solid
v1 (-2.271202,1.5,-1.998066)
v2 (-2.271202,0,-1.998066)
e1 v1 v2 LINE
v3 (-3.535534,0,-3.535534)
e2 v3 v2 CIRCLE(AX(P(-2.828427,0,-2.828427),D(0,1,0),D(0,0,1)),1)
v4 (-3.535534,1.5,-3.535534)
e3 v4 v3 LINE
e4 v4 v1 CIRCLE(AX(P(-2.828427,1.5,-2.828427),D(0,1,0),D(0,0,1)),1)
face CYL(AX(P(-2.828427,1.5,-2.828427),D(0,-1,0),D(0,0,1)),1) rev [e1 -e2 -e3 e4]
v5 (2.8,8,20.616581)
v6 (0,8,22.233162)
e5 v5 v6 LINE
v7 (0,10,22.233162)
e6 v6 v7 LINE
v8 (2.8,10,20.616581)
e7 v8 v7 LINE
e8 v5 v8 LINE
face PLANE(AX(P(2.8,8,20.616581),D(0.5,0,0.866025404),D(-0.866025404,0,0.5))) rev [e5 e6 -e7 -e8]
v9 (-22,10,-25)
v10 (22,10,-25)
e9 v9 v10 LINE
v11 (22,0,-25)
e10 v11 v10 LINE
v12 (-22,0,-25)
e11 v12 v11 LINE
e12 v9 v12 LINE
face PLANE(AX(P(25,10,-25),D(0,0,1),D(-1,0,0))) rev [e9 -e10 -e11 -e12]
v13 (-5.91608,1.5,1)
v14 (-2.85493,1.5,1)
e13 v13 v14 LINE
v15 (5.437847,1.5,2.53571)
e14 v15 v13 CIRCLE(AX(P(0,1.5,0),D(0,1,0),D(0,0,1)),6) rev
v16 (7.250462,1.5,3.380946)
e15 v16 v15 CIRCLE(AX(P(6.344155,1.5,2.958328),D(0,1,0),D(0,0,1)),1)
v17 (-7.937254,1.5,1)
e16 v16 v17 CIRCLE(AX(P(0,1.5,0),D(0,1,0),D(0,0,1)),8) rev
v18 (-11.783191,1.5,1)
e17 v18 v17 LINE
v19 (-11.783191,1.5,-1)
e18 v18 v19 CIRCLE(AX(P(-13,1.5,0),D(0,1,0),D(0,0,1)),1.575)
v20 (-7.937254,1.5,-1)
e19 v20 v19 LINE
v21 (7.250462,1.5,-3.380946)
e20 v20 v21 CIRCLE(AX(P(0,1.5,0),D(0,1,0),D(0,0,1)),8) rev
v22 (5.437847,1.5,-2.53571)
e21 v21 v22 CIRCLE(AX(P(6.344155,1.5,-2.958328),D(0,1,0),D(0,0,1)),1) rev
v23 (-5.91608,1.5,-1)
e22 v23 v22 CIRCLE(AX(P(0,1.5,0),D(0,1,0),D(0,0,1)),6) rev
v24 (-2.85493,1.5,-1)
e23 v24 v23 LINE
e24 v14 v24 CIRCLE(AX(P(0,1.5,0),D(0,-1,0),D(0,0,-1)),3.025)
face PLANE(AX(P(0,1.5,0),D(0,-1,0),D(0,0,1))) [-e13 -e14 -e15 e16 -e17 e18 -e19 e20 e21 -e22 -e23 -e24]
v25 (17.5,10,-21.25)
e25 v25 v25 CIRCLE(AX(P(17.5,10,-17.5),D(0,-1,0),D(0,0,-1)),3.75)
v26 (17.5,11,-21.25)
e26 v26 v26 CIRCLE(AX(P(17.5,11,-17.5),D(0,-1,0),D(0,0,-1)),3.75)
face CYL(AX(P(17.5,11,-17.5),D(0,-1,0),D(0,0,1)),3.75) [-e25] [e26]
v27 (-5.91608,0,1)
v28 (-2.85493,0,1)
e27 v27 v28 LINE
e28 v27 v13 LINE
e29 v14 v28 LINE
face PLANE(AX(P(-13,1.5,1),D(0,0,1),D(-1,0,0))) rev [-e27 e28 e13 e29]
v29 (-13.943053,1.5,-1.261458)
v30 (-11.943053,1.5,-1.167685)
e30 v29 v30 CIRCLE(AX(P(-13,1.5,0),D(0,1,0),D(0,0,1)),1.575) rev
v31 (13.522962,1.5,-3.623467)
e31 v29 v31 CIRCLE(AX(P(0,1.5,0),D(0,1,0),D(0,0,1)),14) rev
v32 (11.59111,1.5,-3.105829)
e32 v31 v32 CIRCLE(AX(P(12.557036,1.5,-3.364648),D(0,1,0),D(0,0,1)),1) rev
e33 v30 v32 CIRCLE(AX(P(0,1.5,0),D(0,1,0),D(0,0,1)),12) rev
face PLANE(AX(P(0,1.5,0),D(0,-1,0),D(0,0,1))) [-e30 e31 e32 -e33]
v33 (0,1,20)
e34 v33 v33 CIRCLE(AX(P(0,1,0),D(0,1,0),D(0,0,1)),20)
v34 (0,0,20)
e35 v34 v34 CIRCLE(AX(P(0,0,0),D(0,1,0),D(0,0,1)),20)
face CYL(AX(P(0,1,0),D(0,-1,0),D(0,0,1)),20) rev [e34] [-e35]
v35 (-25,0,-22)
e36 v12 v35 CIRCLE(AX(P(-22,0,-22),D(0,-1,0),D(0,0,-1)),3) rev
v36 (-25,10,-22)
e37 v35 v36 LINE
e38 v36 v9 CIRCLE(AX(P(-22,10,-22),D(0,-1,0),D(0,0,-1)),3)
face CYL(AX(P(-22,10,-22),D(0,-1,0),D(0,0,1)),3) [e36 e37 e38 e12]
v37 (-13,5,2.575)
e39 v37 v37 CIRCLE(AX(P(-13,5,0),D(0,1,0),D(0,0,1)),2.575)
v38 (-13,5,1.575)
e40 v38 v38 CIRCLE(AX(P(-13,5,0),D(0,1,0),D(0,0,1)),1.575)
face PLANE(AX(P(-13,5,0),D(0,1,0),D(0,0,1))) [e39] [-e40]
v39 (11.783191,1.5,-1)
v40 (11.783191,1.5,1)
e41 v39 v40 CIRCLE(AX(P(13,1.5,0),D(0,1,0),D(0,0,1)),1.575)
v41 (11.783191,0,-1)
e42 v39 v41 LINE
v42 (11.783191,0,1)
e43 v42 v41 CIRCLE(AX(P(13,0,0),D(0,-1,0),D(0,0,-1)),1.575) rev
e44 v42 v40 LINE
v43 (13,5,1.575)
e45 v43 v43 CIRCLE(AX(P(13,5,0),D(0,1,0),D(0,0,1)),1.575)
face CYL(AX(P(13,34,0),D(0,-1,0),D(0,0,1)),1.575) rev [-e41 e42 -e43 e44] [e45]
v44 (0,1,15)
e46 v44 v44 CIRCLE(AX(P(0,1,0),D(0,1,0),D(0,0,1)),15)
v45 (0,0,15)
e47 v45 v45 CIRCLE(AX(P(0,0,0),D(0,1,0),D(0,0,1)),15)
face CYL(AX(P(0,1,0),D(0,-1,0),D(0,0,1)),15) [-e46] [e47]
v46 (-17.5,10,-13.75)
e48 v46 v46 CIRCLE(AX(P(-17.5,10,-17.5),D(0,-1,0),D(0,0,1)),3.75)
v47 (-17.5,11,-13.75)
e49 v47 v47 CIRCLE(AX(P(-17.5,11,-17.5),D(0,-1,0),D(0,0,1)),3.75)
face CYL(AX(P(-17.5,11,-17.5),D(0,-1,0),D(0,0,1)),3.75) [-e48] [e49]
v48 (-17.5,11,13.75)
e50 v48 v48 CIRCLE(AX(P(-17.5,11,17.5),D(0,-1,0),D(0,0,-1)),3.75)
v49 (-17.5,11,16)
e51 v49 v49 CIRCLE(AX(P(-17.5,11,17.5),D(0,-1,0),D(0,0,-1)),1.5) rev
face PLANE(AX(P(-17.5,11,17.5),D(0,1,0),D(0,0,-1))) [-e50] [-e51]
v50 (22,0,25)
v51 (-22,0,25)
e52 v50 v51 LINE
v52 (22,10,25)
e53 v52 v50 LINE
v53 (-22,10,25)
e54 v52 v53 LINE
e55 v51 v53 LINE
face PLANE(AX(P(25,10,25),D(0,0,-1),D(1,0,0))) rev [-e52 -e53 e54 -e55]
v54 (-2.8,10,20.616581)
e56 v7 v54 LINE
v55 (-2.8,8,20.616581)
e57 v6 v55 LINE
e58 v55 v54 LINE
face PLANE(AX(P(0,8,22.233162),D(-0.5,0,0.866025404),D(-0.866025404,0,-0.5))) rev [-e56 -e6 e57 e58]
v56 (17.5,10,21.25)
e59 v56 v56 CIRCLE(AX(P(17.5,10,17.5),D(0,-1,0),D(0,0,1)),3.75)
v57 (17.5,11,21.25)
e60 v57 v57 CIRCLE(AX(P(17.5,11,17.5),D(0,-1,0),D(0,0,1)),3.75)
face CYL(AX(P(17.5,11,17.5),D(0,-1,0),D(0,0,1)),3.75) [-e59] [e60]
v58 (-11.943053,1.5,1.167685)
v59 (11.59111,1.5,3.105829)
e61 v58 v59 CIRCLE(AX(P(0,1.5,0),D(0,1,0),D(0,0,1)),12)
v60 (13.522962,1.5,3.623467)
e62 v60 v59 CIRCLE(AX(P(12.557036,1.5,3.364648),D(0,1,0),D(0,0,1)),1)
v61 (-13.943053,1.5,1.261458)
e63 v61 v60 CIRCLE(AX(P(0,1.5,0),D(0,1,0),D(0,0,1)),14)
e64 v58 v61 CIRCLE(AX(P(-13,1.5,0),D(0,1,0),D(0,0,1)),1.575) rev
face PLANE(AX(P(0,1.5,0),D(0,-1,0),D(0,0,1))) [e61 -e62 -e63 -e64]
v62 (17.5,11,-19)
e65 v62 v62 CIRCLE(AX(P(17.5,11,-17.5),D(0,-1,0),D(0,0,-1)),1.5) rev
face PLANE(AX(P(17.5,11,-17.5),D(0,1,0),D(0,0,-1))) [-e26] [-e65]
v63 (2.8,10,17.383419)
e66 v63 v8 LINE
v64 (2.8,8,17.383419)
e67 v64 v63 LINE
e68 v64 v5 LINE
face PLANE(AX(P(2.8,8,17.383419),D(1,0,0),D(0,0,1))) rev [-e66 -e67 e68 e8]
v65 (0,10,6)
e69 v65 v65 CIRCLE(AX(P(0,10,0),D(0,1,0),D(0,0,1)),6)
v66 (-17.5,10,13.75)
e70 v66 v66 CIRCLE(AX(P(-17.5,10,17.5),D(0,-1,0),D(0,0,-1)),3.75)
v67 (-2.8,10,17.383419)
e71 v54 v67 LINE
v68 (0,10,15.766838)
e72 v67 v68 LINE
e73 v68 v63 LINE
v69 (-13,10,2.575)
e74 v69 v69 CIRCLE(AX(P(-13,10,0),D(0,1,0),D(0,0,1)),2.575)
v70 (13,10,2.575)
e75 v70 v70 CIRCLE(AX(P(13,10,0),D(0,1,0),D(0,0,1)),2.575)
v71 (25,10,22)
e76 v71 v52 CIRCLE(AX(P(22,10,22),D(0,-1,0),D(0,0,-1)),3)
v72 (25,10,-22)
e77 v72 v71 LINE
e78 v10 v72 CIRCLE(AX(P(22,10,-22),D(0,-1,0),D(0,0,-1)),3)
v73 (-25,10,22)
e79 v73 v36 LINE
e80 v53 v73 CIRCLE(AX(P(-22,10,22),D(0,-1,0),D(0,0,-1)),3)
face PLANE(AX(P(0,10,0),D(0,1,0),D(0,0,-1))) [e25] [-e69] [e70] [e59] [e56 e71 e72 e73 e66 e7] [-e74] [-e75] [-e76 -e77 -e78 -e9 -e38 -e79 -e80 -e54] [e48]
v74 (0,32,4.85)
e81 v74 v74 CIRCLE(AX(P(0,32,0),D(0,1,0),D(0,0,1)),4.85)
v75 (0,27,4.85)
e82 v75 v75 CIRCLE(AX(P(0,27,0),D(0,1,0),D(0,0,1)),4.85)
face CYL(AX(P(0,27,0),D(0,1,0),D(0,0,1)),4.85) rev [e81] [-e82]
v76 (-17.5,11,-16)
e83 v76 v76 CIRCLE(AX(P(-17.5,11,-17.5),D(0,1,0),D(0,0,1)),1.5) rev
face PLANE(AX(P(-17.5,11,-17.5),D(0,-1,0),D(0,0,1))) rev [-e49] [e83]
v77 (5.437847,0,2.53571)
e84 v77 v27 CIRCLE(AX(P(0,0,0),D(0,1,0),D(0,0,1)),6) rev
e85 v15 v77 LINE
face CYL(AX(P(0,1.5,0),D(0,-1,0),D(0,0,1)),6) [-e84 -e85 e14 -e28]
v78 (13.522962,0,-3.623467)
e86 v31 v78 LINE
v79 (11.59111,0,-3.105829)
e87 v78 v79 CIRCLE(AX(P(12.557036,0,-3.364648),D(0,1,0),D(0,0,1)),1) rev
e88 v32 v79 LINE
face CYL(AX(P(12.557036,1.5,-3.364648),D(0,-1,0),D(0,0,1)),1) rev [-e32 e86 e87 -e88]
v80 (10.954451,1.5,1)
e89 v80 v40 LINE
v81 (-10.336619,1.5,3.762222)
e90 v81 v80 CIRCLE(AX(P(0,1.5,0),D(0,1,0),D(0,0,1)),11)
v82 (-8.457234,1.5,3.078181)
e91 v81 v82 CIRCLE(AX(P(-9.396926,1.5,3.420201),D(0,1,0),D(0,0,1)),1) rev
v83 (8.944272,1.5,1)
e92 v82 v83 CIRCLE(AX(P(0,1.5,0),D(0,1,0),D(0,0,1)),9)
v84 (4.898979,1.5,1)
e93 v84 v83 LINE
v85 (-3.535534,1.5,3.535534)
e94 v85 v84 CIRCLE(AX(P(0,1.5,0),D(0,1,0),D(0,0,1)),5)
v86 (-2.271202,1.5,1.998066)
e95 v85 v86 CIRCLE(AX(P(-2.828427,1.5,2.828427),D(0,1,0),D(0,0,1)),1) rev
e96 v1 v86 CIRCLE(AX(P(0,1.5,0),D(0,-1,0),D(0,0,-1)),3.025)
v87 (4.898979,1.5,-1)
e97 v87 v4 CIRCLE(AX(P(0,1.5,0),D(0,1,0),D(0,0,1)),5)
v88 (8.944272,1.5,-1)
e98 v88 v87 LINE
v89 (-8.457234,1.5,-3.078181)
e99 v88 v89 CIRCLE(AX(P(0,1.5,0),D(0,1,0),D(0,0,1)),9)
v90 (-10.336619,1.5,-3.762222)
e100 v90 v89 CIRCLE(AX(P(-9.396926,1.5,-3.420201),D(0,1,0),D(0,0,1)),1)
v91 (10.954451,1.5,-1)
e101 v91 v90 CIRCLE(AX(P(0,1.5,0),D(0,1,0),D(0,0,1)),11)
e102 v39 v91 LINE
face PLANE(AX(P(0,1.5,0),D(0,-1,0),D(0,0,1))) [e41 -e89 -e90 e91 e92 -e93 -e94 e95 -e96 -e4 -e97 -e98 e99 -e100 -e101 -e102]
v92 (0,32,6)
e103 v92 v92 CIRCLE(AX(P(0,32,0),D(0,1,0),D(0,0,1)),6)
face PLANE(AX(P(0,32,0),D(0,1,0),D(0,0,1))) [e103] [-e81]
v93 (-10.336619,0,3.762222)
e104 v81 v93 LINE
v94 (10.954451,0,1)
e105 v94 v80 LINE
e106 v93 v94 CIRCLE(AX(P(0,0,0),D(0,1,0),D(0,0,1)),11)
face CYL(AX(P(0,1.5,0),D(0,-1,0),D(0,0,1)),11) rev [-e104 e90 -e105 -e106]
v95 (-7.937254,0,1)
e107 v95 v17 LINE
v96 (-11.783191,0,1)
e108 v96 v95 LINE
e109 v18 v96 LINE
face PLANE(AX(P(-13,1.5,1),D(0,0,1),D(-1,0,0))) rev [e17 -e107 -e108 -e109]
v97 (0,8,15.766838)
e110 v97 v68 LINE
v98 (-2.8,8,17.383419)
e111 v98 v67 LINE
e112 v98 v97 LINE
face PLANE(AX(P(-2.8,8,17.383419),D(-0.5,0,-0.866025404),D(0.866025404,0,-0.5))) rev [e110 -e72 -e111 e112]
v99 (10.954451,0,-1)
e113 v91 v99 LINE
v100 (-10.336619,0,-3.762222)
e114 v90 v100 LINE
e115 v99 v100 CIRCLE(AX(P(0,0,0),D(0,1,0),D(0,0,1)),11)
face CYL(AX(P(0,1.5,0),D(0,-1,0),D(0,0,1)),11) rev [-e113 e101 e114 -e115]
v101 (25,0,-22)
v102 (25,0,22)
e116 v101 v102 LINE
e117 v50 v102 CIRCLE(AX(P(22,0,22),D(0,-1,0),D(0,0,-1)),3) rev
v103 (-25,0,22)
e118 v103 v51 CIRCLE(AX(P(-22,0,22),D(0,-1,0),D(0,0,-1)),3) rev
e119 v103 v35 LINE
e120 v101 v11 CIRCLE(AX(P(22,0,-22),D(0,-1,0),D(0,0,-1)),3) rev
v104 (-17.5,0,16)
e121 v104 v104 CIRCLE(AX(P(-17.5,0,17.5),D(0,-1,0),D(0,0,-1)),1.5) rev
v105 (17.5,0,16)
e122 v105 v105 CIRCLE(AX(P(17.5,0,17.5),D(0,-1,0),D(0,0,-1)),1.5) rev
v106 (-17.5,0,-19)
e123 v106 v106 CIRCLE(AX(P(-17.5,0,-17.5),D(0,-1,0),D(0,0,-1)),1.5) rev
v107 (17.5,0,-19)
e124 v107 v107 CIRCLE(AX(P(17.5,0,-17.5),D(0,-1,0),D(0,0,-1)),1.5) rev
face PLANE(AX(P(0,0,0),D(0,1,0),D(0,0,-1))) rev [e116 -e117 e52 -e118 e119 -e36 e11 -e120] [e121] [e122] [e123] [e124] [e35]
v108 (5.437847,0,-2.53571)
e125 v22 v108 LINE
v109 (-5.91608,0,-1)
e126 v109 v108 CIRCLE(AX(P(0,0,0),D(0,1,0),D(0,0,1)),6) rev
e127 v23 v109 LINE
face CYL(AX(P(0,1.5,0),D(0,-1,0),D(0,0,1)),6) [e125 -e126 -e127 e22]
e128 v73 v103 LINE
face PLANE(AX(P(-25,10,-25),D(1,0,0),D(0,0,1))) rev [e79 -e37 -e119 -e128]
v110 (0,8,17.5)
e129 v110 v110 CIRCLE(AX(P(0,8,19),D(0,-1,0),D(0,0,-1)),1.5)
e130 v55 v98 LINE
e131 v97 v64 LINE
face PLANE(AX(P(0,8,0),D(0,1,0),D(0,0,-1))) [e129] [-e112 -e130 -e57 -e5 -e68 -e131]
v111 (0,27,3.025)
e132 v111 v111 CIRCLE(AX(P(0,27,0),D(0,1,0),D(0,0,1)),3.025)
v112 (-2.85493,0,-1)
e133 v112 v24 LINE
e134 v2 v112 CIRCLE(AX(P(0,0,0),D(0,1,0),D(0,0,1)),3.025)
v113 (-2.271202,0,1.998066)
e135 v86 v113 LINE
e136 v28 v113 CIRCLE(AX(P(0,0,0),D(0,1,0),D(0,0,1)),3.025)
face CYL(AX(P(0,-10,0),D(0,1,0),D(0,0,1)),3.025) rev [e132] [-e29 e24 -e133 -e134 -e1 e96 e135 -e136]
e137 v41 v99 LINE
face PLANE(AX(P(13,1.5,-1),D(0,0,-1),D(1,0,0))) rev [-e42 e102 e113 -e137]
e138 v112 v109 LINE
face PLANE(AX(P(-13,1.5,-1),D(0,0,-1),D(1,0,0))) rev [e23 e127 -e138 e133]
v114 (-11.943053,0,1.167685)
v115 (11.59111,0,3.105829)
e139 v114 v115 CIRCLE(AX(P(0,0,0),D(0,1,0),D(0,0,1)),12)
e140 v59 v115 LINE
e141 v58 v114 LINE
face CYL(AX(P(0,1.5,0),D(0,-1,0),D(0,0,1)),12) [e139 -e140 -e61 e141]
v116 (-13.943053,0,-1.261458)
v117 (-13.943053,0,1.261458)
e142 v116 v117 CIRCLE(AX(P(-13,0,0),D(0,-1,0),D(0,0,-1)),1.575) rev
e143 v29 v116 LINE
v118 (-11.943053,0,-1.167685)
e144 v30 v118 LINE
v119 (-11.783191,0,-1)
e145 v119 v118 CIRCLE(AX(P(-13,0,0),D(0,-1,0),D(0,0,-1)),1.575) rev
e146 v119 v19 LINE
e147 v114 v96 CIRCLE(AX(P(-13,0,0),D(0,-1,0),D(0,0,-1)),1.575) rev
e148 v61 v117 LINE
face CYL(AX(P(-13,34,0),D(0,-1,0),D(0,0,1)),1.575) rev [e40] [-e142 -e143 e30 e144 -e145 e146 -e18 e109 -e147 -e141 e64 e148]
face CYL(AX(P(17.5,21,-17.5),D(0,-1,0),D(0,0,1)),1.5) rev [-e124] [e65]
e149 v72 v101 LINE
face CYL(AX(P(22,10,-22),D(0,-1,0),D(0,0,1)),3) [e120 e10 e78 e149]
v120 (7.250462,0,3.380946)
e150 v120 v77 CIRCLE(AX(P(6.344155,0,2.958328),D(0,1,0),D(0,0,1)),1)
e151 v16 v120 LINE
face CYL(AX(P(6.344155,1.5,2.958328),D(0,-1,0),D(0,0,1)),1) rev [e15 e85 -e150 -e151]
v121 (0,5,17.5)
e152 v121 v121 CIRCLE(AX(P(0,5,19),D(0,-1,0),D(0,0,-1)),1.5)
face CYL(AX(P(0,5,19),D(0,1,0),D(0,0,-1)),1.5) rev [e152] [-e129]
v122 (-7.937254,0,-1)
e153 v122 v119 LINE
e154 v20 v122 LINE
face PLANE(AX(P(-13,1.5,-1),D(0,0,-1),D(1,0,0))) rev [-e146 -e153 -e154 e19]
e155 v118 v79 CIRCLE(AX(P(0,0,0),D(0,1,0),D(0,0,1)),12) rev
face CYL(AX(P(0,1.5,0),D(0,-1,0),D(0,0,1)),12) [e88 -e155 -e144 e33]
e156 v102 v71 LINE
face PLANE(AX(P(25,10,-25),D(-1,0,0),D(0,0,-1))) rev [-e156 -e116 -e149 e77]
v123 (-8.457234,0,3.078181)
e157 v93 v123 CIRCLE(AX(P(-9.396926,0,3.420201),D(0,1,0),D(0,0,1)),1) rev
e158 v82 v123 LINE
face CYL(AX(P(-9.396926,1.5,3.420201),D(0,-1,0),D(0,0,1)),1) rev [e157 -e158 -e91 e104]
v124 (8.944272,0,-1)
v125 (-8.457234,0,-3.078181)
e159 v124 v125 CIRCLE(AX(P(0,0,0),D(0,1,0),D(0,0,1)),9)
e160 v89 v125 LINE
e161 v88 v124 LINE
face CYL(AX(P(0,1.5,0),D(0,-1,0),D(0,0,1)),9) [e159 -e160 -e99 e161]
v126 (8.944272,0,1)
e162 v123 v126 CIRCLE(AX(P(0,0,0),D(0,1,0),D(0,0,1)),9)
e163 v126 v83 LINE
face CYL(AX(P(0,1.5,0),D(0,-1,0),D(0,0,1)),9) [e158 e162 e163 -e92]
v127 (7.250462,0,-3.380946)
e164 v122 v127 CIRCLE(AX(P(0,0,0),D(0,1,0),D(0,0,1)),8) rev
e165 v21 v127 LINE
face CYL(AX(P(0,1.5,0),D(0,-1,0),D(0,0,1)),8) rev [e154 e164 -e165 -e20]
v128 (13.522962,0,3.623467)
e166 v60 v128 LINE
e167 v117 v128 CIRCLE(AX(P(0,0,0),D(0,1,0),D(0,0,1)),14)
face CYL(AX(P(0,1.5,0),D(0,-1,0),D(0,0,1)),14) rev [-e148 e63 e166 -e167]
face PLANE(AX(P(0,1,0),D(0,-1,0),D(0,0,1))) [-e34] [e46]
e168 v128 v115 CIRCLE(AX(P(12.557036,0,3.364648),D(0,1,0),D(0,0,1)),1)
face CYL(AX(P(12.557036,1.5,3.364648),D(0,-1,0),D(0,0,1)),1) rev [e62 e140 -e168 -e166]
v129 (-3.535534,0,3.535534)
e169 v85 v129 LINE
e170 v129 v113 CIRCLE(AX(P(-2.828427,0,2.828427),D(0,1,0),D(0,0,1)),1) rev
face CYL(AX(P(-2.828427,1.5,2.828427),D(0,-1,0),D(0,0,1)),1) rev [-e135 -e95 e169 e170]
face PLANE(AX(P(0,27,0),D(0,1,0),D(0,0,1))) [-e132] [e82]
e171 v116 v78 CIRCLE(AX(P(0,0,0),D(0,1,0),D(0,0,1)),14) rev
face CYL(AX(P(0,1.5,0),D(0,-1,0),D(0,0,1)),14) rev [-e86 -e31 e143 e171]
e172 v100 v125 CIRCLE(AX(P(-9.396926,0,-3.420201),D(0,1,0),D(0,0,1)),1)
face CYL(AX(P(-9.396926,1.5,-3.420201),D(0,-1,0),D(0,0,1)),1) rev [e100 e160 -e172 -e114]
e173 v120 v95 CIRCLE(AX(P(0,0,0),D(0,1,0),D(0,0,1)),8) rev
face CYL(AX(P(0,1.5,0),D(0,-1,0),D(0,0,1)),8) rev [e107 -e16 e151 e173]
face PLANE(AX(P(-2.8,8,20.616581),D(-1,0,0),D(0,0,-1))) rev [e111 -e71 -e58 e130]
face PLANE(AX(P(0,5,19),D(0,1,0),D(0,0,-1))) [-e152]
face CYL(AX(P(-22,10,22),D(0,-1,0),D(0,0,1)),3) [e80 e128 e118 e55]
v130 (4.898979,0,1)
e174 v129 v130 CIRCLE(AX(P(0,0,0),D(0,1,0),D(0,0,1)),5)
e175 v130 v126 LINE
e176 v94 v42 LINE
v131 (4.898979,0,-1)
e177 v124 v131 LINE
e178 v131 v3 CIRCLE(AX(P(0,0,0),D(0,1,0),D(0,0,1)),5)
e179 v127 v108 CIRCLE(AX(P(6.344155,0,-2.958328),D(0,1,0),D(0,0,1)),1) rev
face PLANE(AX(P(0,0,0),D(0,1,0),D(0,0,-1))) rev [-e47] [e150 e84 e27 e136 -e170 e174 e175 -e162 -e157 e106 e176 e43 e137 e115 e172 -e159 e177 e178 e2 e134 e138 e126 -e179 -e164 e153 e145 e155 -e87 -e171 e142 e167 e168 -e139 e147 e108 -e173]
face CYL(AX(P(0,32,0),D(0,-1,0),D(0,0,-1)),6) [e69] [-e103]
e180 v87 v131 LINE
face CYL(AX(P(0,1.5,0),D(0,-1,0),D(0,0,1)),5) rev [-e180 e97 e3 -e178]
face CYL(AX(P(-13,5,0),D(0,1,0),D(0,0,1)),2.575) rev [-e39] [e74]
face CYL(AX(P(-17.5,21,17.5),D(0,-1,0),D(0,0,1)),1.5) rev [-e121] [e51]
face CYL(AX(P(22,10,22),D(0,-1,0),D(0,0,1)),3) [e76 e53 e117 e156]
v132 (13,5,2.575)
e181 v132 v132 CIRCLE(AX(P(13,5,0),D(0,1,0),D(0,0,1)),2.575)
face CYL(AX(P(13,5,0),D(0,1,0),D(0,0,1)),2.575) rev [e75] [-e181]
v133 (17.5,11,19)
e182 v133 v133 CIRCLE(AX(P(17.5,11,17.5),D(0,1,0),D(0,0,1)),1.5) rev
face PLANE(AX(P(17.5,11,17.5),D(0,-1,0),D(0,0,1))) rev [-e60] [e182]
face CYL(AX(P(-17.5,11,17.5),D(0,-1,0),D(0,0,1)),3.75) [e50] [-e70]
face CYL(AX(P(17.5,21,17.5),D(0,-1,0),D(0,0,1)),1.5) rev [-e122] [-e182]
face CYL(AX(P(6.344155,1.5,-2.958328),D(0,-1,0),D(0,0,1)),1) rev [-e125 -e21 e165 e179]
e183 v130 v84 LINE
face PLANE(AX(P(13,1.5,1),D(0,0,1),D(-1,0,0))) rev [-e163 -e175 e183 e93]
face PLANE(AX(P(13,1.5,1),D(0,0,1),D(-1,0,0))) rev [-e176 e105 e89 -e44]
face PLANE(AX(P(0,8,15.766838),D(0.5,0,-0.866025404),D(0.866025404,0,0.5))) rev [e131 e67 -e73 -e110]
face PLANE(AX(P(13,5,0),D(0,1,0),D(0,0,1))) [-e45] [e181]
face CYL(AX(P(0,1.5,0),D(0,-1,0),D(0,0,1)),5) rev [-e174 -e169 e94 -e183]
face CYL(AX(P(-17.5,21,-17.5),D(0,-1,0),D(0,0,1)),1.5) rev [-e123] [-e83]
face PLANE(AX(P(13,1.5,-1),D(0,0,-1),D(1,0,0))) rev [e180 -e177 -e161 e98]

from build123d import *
from OCP.BRepFilletAPI import BRepFilletAPI_MakeChamfer

# Parameters (mm, degrees)
SKETCH1_W               = 50
SKETCH1_H               = 50
BODY_DEPTH              = 10
SKETCH2_R               = 11.5
CUT_VIEW_DEPTH          = 6
FILLETBODY_R            = 3
SKETCH3_R               = 3.75
BOLT_EXTRUDE_DEPTH      = 1
BOLT_DEPTH              = 10
BOLT_DEPTH_BACK         = 16
SKETCH4_R               = 1.5
HEX_2_DEPTH             = 2
SKETCH19_R              = 1.5
HEX_BOLT_DEPTH          = 3
SKETCH6_R               = 4
FIELD1_DEPTH            = 7
FIELD2_R                = 4
SKETCH7_R               = 2.575
PORTS1_DEPTH            = 12
PORTS2_DEPTH            = 12
PORTS2_DEPTH_BACK       = 32
SKETCH10_R              = 1.575
SKETCH11_R              = 20
SKETCH11_R_2            = 15
SEAL1_DEPTH             = 1
FLOWFIELD_START         = -1.5
FLOWFIELD_DEPTH         = 1.5
FLOWFIELD_CHANNEL_DEPTH = 1.5
SKETCH20_R              = 3
SKETCH20_R_2            = 1.575
BARB_DEPTH              = 3
BARB_CHAMFER_SIZE       = 2.5
BARB_CHAMFER_SIZE2      = 1
BODY_MOVE_COPY2_ANGLE   = 180
BOSS_EXTRUDE1_DEPTH     = 6
SKETCH22_R              = 6
RE_BODY_DEPTH           = 22
SKETCH23_R              = 4.85
THREAD_DEPTH            = 5
SKETCH24_R              = 3.025
PORT_DEPTH              = 37
SKETCH27_R              = 3
CUT_EXTRUDE3_DEPTH      = 15
SKETCH28_R              = 2.575
CUT_EXTRUDE4_DEPTH      = 5


with BuildPart() as part:
    # Sketch1 → Body (new body)
    with BuildSketch(Plane(origin=(0, 0, 0), x_dir=(1, 0, 0), z_dir=(0, 1, 0))):
        Rectangle(SKETCH1_W, SKETCH1_H)
    extrude(amount=BODY_DEPTH)

    # Sketch2 → Cut view (cut)
    with BuildSketch(Plane(origin=(0, 10, 0), x_dir=(1, 0, 0), z_dir=(0, 1, 0))):
        with Locations(Location((0, 0, 0), (0, 0, 270))):
            Circle(SKETCH2_R)
    extrude(amount=-CUT_VIEW_DEPTH, mode=Mode.SUBTRACT)

    # FilletBody
    filletbody_edges = [part.edges().sort_by_distance(p)[0] for p in [
        (-25, 5, -25),
        (25, 5, -25),
        (25, 5, 25),
        (-25, 5, 25),
    ]]
    fillet(filletbody_edges, radius=FILLETBODY_R)

    # Sketch3 → Bolt extrude (add)
    with BuildSketch(Plane(origin=(0, 10, 0), x_dir=(1, 0, 0), z_dir=(0, 1, 0))):
        with Locations(Location((-17.5, 17.5, 0), (0, 0, 270))):
            Circle(SKETCH3_R)
        with Locations(Location((17.5, 17.5, 0), (0, 0, 90))):
            Circle(SKETCH3_R)
        with Locations(Location((17.5, -17.5, 0), (0, 0, 270))):
            Circle(SKETCH3_R)
        with Locations(Location((-17.5, -17.5, 0), (0, 0, 90))):
            Circle(SKETCH3_R)
    extrude(amount=BOLT_EXTRUDE_DEPTH)

    # Sketch4 → Bolt (cut, two sides: drawn at the far end of the back side and taken through both)
    with BuildSketch(Plane(origin=(0, 11, 0), x_dir=(1, 0, 0), z_dir=(0, 1, 0)).offset(-BOLT_DEPTH_BACK)):
        with Locations(Location((-17.5, 17.5, 0), (0, 0, 270))):
            Circle(SKETCH4_R)
        with Locations(Location((17.5, 17.5, 0), (0, 0, 90))):
            Circle(SKETCH4_R)
        with Locations(Location((17.5, -17.5, 0), (0, 0, 270))):
            Circle(SKETCH4_R)
        with Locations(Location((-17.5, -17.5, 0), (0, 0, 90))):
            Circle(SKETCH4_R)
    extrude(amount=BOLT_DEPTH + BOLT_DEPTH_BACK, mode=Mode.SUBTRACT)

    # Sketch5 → Hex 2 (cut)
    with BuildSketch(Plane(origin=(0, 10, 0), x_dir=(1, 0, 0), z_dir=(0, 1, 0))):
        Polygon((0, 22.233161507), (-2.8, 20.616580754), (-2.8, 17.383419246), (0, 15.766838493), (2.8, 17.383419246), (2.8, 20.616580754), align=None)
    extrude(amount=-HEX_2_DEPTH, mode=Mode.SUBTRACT)

    # Sketch19 → Hex_bolt (cut)
    with BuildSketch(Plane(origin=(0, 8, 0), x_dir=(1, 0, 0), z_dir=(0, 1, 0))):
        with Locations(Location((0, 19, 0), (0, 0, 270))):
            Circle(SKETCH19_R)
    extrude(amount=-HEX_BOLT_DEPTH, mode=Mode.SUBTRACT)

    # Sketch6 → Field1 (add)
    with BuildSketch(Plane(origin=(0, 10, 0), x_dir=(1, 0, 0), z_dir=(0, 1, 0))):
        with Locations((-13, 0)):
            Circle(SKETCH6_R)
        with Locations((13, 0)):
            Circle(SKETCH6_R)
    extrude(amount=-FIELD1_DEPTH)

    # Field2
    field2_edges = [part.edges().sort_by_distance(p)[0] for p in [
        (-10.971153846, 7, 3.447286365),
        (-10.971153846, 7, -3.447286365),
        (10.971153846, 7, -3.447286365),
        (10.971153846, 7, 3.447286365),
    ]]
    fillet(field2_edges, radius=FIELD2_R)

    # Sketch7 → Ports1 (add)
    with BuildSketch(Plane(origin=(0, 10, 0), x_dir=(1, 0, 0), z_dir=(0, 1, 0))):
        with Locations(Location((-13, 0, 0), (0, 0, 270))):
            Circle(SKETCH7_R)
        with Locations(Location((13, 0, 0), (0, 0, 90))):
            Circle(SKETCH7_R)
    extrude(amount=PORTS1_DEPTH)

    # Sketch10 → Ports2 (cut, two sides: drawn at the far end of the back side and taken through both)
    with BuildSketch(Plane(origin=(0, 22, 0), x_dir=(1, 0, 0), z_dir=(0, 1, 0)).offset(-PORTS2_DEPTH_BACK)):
        with Locations(Location((-13, 0, 0), (0, 0, 270))):
            Circle(SKETCH10_R)
        with Locations(Location((13, 0, 0), (0, 0, 90))):
            Circle(SKETCH10_R)
    extrude(amount=PORTS2_DEPTH + PORTS2_DEPTH_BACK, mode=Mode.SUBTRACT)

    # Sketch11 → Seal1 (cut)
    with BuildSketch(Plane.XZ):
        with Locations(Location((0, 0, 0), (0, 0, 270))):
            Circle(SKETCH11_R)
        with Locations(Location((0, 0, 0), (0, 0, 270))):
            Circle(SKETCH11_R_2, mode=Mode.SUBTRACT)
    extrude(amount=-SEAL1_DEPTH, mode=Mode.SUBTRACT)

    # Sketch15 → FlowField (cut)
    with BuildSketch(Plane.XZ.offset(FLOWFIELD_START)):
        with BuildLine():
            ThreePointArc((13.522961568, 3.623466631), (-1.199537572, 13.948516395), (-13.943052885, 1.261457989))
            ThreePointArc((-13.943052885, 1.261457989), (-12.926234652, 1.573271646), (-11.943052885, 1.167684801))
            ThreePointArc((-11.943052885, 1.167684801), (-0.984919414, 11.95951227), (11.591109915, 3.105828541))
            ThreePointArc((11.591109915, 3.105828541), (12.815854787, 2.39872176), (13.522961568, 3.623466631))
        make_face()
        with BuildLine():
            ThreePointArc((11, 0), (1.910129954, 10.832885283), (-10.336618829, 3.762221577))
            ThreePointArc((-10.336618829, 3.762221577), (-9.738946351, 2.480508812), (-8.457233587, 3.07818129))
            ThreePointArc((-8.457233587, 3.07818129), (1.562833599, 8.863269777), (9, 0))
            Line((9, 0), (11, 0))
        make_face()
        with BuildLine():
            ThreePointArc((7.250462296, 3.380946094), (6.766772771, 2.052020045), (5.437846722, 2.53570957))
            ThreePointArc((5.437846722, 2.53570957), (-1.298637684, 5.857776043), (-6, 0))
            Line((-6, 0), (-8, 0))
            ThreePointArc((-8, 0), (-1.731516912, 7.810368057), (7.250462296, 3.380946094))
        make_face()
        with BuildLine():
            ThreePointArc((5, 0), (1.913417162, 4.619397663), (-3.535533906, 3.535533906))
            ThreePointArc((-3.535533906, 3.535533906), (-3.535533906, 2.121320344), (-2.121320344, 2.121320344))
            ThreePointArc((-2.121320344, 2.121320344), (1.148050297, 2.771638598), (3, 0))
            Line((3, 0), (5, 0))
        make_face()
        with BuildLine():
            ThreePointArc((5, 0), (1.913417162, -4.619397663), (-3.535533906, -3.535533906))
            ThreePointArc((-3.535533906, -3.535533906), (-3.535533906, -2.121320344), (-2.121320344, -2.121320344))
            ThreePointArc((-2.121320344, -2.121320344), (1.148050297, -2.771638598), (3, 0))
            Line((3, 0), (5, 0))
        make_face()
        with BuildLine():
            ThreePointArc((-8, 0), (-1.731516912, -7.810368057), (7.250462296, -3.380946094))
            ThreePointArc((7.250462296, -3.380946094), (6.766772771, -2.052020045), (5.437846722, -2.53570957))
            ThreePointArc((5.437846722, -2.53570957), (-1.298637684, -5.857776043), (-6, 0))
            Line((-6, 0), (-8, 0))
        make_face()
        with BuildLine():
            ThreePointArc((11, 0), (1.910129954, -10.832885283), (-10.336618829, -3.762221577))
            ThreePointArc((-10.336618829, -3.762221577), (-9.738946351, -2.480508812), (-8.457233587, -3.07818129))
            ThreePointArc((-8.457233587, -3.07818129), (1.562833599, -8.863269777), (9, 0))
            Line((9, 0), (11, 0))
        make_face()
        with BuildLine():
            ThreePointArc((-11.943052885, -1.167684801), (-12.926234652, -1.573271646), (-13.943052885, -1.261457989))
            ThreePointArc((-13.943052885, -1.261457989), (-1.199537572, -13.948516395), (13.522961568, -3.623466631))
            ThreePointArc((13.522961568, -3.623466631), (12.815854787, -2.39872176), (11.591109915, -3.105828541))
            ThreePointArc((11.591109915, -3.105828541), (-0.984919414, -11.95951227), (-11.943052885, -1.167684801))
        make_face()
    extrude(amount=FLOWFIELD_DEPTH, mode=Mode.SUBTRACT)

    # Sketch16 → FlowField_Channel (cut)
    with BuildSketch(Plane.XZ):
        with BuildLine():
            Line((-13, 1), (0, 1))
            ThreePointArc((0, 1), (1, 0), (0, -1))
            Line((0, -1), (-13, -1))
            ThreePointArc((-13, -1), (-14, 0), (-13, 1))
        make_face()
        with BuildLine():
            Line((13, -1), (4.429119544, -1))
            ThreePointArc((4.429119544, -1), (3.429119544, 0), (4.429119544, 1))
            Line((4.429119544, 1), (13, 1))
            ThreePointArc((13, 1), (14, 0), (13, -1))
        make_face()
    extrude(amount=-FLOWFIELD_CHANNEL_DEPTH, mode=Mode.SUBTRACT)


with BuildPart() as body_2:
    # Mirror3: mirrored copy
    add(part.part.mirror(Plane.ZX))

    # Sketch20 → Barb (add)
    # profile 1 of 2: a face of its own
    with BuildSketch(Plane.XZ.offset(22)):
        with Locations(Location((-13, 0, 0), (0, 0, 270))):
            Circle(SKETCH20_R)
        with Locations(Location((-13, 0, 0), (0, 0, 270))):
            Circle(SKETCH20_R_2, mode=Mode.SUBTRACT)
    # profile 2 of 2: a face of its own
    with BuildSketch(Plane.XZ.offset(22)):
        with Locations(Location((13, 0, 0), (0, 0, 270))):
            Circle(SKETCH20_R)
        with Locations(Location((13, 0, 0), (0, 0, 270))):
            Circle(SKETCH20_R_2, mode=Mode.SUBTRACT)
    extrude(amount=BARB_DEPTH)

    # Barb_Chamfer: one chamfer whose edges measure the first distance from different faces: ONE call of the kernel's chamfer builder (chamfer() names one face for all edges)
    barb_chamfer_edges_1 = [body_2.edges().sort_by_distance(p)[0] for p in [
        (-13, -25, 3),
    ]]
    barb_chamfer_side_1 = [body_2.faces().sort_by_distance(p)[0] for p in [
        (-13, -23.5, 3),
    ]]
    barb_chamfer_edges_2 = [body_2.edges().sort_by_distance(p)[0] for p in [
        (13, -25, 3),
    ]]
    barb_chamfer_side_2 = [body_2.faces().sort_by_distance(p)[0] for p in [
        (13, -23.5, 3),
    ]]
    barb_chamfer = BRepFilletAPI_MakeChamfer(body_2.part.solid().wrapped)
    for e in barb_chamfer_edges_1:
        barb_chamfer.Add(BARB_CHAMFER_SIZE, BARB_CHAMFER_SIZE2, e.wrapped, barb_chamfer_side_1[0].wrapped)  # the first distance lies on this face
    for e in barb_chamfer_edges_2:
        barb_chamfer.Add(BARB_CHAMFER_SIZE, BARB_CHAMFER_SIZE2, e.wrapped, barb_chamfer_side_2[0].wrapped)  # the first distance lies on this face
    add(Compound.cast(barb_chamfer.Shape()), mode=Mode.REPLACE)


with BuildPart() as body_2_1:
    # Body-Move/Copy2: moved
    add(body_2.part.rotate(Axis((0, -12.5, 0), (1, 0, 0)), BODY_MOVE_COPY2_ANGLE))


with BuildPart() as body_2_2:
    # Body-Move/Copy3: read off the stored shape, not the designer's step
    # Body-Move/Copy3: moved
    add(body_2_1.part.moved(Location((0, 25, 0))))

    # Sketch21 → Boss-Extrude1 (add)
    with BuildSketch(Plane(origin=(0, 4, 0), x_dir=(1, 0, 0), z_dir=(0, 1, 0))):
        with BuildLine():
            ThreePointArc((9.509615385, 6.466623171), (0, 11.5), (-9.509615385, 6.466623171))
            ThreePointArc((-9.509615385, 6.466623171), (-10.201044652, 4.301187917), (-9.600961538, 2.108681469))
            ThreePointArc((-9.600961538, 2.108681469), (-9, 0), (-9.600961538, -2.108681469))
            ThreePointArc((-9.600961538, -2.108681469), (-10.201044652, -4.301187917), (-9.509615385, -6.466623171))
            ThreePointArc((-9.509615385, -6.466623171), (0, -11.5), (9.509615385, -6.466623171))
            ThreePointArc((9.509615385, -6.466623171), (10.201044652, -4.301187917), (9.600961538, -2.108681469))
            ThreePointArc((9.600961538, -2.108681469), (9, 0), (9.600961538, 2.108681469))
            ThreePointArc((9.600961538, 2.108681469), (10.201044652, 4.301187917), (9.509615385, 6.466623171))
        make_face()
    extrude(amount=BOSS_EXTRUDE1_DEPTH)

    # Sketch22 → RE Body (add)
    with BuildSketch(Plane(origin=(0, 10, 0), x_dir=(1, 0, 0), z_dir=(0, 1, 0))):
        with Locations(Location((0, 0, 0), (0, 0, 270))):
            Circle(SKETCH22_R)
    extrude(amount=RE_BODY_DEPTH)

    # Sketch23 → Thread (cut)
    with BuildSketch(Plane(origin=(0, 32, 0), x_dir=(1, 0, 0), z_dir=(0, 1, 0))):
        with Locations(Location((0, 0, 0), (0, 0, 270))):
            Circle(SKETCH23_R)
    extrude(amount=-THREAD_DEPTH, mode=Mode.SUBTRACT)

    # Sketch24 → Port (cut)
    with BuildSketch(Plane(origin=(0, 27, 0), x_dir=(1, 0, 0), z_dir=(0, 1, 0))):
        with Locations(Location((0, 0, 0), (0, 0, 270))):
            Circle(SKETCH24_R)
    extrude(amount=-PORT_DEPTH, mode=Mode.SUBTRACT)

    # Sketch27 → Cut-Extrude3 (cut)
    with BuildSketch(Plane(origin=(0, 25, 0), x_dir=(1, 0, 0), z_dir=(0, 1, 0))):
        with Locations((-13, 0)):
            Circle(SKETCH27_R)
        with Locations((13, 0)):
            Circle(SKETCH27_R)
    extrude(amount=-CUT_EXTRUDE3_DEPTH, mode=Mode.SUBTRACT)

    # Sketch28 → Cut-Extrude4 (cut)
    with BuildSketch(Plane(origin=(0, 10, 0), x_dir=(1, 0, 0), z_dir=(0, 1, 0))):
        with Locations(Location((-13, 0, 0), (0, 0, 270))):
            Circle(SKETCH28_R)
        with Locations(Location((13, 0, 0), (0, 0, 270))):
            Circle(SKETCH28_R)
    extrude(amount=-CUT_EXTRUDE4_DEPTH, mode=Mode.SUBTRACT)


solid = body_2_2.part
